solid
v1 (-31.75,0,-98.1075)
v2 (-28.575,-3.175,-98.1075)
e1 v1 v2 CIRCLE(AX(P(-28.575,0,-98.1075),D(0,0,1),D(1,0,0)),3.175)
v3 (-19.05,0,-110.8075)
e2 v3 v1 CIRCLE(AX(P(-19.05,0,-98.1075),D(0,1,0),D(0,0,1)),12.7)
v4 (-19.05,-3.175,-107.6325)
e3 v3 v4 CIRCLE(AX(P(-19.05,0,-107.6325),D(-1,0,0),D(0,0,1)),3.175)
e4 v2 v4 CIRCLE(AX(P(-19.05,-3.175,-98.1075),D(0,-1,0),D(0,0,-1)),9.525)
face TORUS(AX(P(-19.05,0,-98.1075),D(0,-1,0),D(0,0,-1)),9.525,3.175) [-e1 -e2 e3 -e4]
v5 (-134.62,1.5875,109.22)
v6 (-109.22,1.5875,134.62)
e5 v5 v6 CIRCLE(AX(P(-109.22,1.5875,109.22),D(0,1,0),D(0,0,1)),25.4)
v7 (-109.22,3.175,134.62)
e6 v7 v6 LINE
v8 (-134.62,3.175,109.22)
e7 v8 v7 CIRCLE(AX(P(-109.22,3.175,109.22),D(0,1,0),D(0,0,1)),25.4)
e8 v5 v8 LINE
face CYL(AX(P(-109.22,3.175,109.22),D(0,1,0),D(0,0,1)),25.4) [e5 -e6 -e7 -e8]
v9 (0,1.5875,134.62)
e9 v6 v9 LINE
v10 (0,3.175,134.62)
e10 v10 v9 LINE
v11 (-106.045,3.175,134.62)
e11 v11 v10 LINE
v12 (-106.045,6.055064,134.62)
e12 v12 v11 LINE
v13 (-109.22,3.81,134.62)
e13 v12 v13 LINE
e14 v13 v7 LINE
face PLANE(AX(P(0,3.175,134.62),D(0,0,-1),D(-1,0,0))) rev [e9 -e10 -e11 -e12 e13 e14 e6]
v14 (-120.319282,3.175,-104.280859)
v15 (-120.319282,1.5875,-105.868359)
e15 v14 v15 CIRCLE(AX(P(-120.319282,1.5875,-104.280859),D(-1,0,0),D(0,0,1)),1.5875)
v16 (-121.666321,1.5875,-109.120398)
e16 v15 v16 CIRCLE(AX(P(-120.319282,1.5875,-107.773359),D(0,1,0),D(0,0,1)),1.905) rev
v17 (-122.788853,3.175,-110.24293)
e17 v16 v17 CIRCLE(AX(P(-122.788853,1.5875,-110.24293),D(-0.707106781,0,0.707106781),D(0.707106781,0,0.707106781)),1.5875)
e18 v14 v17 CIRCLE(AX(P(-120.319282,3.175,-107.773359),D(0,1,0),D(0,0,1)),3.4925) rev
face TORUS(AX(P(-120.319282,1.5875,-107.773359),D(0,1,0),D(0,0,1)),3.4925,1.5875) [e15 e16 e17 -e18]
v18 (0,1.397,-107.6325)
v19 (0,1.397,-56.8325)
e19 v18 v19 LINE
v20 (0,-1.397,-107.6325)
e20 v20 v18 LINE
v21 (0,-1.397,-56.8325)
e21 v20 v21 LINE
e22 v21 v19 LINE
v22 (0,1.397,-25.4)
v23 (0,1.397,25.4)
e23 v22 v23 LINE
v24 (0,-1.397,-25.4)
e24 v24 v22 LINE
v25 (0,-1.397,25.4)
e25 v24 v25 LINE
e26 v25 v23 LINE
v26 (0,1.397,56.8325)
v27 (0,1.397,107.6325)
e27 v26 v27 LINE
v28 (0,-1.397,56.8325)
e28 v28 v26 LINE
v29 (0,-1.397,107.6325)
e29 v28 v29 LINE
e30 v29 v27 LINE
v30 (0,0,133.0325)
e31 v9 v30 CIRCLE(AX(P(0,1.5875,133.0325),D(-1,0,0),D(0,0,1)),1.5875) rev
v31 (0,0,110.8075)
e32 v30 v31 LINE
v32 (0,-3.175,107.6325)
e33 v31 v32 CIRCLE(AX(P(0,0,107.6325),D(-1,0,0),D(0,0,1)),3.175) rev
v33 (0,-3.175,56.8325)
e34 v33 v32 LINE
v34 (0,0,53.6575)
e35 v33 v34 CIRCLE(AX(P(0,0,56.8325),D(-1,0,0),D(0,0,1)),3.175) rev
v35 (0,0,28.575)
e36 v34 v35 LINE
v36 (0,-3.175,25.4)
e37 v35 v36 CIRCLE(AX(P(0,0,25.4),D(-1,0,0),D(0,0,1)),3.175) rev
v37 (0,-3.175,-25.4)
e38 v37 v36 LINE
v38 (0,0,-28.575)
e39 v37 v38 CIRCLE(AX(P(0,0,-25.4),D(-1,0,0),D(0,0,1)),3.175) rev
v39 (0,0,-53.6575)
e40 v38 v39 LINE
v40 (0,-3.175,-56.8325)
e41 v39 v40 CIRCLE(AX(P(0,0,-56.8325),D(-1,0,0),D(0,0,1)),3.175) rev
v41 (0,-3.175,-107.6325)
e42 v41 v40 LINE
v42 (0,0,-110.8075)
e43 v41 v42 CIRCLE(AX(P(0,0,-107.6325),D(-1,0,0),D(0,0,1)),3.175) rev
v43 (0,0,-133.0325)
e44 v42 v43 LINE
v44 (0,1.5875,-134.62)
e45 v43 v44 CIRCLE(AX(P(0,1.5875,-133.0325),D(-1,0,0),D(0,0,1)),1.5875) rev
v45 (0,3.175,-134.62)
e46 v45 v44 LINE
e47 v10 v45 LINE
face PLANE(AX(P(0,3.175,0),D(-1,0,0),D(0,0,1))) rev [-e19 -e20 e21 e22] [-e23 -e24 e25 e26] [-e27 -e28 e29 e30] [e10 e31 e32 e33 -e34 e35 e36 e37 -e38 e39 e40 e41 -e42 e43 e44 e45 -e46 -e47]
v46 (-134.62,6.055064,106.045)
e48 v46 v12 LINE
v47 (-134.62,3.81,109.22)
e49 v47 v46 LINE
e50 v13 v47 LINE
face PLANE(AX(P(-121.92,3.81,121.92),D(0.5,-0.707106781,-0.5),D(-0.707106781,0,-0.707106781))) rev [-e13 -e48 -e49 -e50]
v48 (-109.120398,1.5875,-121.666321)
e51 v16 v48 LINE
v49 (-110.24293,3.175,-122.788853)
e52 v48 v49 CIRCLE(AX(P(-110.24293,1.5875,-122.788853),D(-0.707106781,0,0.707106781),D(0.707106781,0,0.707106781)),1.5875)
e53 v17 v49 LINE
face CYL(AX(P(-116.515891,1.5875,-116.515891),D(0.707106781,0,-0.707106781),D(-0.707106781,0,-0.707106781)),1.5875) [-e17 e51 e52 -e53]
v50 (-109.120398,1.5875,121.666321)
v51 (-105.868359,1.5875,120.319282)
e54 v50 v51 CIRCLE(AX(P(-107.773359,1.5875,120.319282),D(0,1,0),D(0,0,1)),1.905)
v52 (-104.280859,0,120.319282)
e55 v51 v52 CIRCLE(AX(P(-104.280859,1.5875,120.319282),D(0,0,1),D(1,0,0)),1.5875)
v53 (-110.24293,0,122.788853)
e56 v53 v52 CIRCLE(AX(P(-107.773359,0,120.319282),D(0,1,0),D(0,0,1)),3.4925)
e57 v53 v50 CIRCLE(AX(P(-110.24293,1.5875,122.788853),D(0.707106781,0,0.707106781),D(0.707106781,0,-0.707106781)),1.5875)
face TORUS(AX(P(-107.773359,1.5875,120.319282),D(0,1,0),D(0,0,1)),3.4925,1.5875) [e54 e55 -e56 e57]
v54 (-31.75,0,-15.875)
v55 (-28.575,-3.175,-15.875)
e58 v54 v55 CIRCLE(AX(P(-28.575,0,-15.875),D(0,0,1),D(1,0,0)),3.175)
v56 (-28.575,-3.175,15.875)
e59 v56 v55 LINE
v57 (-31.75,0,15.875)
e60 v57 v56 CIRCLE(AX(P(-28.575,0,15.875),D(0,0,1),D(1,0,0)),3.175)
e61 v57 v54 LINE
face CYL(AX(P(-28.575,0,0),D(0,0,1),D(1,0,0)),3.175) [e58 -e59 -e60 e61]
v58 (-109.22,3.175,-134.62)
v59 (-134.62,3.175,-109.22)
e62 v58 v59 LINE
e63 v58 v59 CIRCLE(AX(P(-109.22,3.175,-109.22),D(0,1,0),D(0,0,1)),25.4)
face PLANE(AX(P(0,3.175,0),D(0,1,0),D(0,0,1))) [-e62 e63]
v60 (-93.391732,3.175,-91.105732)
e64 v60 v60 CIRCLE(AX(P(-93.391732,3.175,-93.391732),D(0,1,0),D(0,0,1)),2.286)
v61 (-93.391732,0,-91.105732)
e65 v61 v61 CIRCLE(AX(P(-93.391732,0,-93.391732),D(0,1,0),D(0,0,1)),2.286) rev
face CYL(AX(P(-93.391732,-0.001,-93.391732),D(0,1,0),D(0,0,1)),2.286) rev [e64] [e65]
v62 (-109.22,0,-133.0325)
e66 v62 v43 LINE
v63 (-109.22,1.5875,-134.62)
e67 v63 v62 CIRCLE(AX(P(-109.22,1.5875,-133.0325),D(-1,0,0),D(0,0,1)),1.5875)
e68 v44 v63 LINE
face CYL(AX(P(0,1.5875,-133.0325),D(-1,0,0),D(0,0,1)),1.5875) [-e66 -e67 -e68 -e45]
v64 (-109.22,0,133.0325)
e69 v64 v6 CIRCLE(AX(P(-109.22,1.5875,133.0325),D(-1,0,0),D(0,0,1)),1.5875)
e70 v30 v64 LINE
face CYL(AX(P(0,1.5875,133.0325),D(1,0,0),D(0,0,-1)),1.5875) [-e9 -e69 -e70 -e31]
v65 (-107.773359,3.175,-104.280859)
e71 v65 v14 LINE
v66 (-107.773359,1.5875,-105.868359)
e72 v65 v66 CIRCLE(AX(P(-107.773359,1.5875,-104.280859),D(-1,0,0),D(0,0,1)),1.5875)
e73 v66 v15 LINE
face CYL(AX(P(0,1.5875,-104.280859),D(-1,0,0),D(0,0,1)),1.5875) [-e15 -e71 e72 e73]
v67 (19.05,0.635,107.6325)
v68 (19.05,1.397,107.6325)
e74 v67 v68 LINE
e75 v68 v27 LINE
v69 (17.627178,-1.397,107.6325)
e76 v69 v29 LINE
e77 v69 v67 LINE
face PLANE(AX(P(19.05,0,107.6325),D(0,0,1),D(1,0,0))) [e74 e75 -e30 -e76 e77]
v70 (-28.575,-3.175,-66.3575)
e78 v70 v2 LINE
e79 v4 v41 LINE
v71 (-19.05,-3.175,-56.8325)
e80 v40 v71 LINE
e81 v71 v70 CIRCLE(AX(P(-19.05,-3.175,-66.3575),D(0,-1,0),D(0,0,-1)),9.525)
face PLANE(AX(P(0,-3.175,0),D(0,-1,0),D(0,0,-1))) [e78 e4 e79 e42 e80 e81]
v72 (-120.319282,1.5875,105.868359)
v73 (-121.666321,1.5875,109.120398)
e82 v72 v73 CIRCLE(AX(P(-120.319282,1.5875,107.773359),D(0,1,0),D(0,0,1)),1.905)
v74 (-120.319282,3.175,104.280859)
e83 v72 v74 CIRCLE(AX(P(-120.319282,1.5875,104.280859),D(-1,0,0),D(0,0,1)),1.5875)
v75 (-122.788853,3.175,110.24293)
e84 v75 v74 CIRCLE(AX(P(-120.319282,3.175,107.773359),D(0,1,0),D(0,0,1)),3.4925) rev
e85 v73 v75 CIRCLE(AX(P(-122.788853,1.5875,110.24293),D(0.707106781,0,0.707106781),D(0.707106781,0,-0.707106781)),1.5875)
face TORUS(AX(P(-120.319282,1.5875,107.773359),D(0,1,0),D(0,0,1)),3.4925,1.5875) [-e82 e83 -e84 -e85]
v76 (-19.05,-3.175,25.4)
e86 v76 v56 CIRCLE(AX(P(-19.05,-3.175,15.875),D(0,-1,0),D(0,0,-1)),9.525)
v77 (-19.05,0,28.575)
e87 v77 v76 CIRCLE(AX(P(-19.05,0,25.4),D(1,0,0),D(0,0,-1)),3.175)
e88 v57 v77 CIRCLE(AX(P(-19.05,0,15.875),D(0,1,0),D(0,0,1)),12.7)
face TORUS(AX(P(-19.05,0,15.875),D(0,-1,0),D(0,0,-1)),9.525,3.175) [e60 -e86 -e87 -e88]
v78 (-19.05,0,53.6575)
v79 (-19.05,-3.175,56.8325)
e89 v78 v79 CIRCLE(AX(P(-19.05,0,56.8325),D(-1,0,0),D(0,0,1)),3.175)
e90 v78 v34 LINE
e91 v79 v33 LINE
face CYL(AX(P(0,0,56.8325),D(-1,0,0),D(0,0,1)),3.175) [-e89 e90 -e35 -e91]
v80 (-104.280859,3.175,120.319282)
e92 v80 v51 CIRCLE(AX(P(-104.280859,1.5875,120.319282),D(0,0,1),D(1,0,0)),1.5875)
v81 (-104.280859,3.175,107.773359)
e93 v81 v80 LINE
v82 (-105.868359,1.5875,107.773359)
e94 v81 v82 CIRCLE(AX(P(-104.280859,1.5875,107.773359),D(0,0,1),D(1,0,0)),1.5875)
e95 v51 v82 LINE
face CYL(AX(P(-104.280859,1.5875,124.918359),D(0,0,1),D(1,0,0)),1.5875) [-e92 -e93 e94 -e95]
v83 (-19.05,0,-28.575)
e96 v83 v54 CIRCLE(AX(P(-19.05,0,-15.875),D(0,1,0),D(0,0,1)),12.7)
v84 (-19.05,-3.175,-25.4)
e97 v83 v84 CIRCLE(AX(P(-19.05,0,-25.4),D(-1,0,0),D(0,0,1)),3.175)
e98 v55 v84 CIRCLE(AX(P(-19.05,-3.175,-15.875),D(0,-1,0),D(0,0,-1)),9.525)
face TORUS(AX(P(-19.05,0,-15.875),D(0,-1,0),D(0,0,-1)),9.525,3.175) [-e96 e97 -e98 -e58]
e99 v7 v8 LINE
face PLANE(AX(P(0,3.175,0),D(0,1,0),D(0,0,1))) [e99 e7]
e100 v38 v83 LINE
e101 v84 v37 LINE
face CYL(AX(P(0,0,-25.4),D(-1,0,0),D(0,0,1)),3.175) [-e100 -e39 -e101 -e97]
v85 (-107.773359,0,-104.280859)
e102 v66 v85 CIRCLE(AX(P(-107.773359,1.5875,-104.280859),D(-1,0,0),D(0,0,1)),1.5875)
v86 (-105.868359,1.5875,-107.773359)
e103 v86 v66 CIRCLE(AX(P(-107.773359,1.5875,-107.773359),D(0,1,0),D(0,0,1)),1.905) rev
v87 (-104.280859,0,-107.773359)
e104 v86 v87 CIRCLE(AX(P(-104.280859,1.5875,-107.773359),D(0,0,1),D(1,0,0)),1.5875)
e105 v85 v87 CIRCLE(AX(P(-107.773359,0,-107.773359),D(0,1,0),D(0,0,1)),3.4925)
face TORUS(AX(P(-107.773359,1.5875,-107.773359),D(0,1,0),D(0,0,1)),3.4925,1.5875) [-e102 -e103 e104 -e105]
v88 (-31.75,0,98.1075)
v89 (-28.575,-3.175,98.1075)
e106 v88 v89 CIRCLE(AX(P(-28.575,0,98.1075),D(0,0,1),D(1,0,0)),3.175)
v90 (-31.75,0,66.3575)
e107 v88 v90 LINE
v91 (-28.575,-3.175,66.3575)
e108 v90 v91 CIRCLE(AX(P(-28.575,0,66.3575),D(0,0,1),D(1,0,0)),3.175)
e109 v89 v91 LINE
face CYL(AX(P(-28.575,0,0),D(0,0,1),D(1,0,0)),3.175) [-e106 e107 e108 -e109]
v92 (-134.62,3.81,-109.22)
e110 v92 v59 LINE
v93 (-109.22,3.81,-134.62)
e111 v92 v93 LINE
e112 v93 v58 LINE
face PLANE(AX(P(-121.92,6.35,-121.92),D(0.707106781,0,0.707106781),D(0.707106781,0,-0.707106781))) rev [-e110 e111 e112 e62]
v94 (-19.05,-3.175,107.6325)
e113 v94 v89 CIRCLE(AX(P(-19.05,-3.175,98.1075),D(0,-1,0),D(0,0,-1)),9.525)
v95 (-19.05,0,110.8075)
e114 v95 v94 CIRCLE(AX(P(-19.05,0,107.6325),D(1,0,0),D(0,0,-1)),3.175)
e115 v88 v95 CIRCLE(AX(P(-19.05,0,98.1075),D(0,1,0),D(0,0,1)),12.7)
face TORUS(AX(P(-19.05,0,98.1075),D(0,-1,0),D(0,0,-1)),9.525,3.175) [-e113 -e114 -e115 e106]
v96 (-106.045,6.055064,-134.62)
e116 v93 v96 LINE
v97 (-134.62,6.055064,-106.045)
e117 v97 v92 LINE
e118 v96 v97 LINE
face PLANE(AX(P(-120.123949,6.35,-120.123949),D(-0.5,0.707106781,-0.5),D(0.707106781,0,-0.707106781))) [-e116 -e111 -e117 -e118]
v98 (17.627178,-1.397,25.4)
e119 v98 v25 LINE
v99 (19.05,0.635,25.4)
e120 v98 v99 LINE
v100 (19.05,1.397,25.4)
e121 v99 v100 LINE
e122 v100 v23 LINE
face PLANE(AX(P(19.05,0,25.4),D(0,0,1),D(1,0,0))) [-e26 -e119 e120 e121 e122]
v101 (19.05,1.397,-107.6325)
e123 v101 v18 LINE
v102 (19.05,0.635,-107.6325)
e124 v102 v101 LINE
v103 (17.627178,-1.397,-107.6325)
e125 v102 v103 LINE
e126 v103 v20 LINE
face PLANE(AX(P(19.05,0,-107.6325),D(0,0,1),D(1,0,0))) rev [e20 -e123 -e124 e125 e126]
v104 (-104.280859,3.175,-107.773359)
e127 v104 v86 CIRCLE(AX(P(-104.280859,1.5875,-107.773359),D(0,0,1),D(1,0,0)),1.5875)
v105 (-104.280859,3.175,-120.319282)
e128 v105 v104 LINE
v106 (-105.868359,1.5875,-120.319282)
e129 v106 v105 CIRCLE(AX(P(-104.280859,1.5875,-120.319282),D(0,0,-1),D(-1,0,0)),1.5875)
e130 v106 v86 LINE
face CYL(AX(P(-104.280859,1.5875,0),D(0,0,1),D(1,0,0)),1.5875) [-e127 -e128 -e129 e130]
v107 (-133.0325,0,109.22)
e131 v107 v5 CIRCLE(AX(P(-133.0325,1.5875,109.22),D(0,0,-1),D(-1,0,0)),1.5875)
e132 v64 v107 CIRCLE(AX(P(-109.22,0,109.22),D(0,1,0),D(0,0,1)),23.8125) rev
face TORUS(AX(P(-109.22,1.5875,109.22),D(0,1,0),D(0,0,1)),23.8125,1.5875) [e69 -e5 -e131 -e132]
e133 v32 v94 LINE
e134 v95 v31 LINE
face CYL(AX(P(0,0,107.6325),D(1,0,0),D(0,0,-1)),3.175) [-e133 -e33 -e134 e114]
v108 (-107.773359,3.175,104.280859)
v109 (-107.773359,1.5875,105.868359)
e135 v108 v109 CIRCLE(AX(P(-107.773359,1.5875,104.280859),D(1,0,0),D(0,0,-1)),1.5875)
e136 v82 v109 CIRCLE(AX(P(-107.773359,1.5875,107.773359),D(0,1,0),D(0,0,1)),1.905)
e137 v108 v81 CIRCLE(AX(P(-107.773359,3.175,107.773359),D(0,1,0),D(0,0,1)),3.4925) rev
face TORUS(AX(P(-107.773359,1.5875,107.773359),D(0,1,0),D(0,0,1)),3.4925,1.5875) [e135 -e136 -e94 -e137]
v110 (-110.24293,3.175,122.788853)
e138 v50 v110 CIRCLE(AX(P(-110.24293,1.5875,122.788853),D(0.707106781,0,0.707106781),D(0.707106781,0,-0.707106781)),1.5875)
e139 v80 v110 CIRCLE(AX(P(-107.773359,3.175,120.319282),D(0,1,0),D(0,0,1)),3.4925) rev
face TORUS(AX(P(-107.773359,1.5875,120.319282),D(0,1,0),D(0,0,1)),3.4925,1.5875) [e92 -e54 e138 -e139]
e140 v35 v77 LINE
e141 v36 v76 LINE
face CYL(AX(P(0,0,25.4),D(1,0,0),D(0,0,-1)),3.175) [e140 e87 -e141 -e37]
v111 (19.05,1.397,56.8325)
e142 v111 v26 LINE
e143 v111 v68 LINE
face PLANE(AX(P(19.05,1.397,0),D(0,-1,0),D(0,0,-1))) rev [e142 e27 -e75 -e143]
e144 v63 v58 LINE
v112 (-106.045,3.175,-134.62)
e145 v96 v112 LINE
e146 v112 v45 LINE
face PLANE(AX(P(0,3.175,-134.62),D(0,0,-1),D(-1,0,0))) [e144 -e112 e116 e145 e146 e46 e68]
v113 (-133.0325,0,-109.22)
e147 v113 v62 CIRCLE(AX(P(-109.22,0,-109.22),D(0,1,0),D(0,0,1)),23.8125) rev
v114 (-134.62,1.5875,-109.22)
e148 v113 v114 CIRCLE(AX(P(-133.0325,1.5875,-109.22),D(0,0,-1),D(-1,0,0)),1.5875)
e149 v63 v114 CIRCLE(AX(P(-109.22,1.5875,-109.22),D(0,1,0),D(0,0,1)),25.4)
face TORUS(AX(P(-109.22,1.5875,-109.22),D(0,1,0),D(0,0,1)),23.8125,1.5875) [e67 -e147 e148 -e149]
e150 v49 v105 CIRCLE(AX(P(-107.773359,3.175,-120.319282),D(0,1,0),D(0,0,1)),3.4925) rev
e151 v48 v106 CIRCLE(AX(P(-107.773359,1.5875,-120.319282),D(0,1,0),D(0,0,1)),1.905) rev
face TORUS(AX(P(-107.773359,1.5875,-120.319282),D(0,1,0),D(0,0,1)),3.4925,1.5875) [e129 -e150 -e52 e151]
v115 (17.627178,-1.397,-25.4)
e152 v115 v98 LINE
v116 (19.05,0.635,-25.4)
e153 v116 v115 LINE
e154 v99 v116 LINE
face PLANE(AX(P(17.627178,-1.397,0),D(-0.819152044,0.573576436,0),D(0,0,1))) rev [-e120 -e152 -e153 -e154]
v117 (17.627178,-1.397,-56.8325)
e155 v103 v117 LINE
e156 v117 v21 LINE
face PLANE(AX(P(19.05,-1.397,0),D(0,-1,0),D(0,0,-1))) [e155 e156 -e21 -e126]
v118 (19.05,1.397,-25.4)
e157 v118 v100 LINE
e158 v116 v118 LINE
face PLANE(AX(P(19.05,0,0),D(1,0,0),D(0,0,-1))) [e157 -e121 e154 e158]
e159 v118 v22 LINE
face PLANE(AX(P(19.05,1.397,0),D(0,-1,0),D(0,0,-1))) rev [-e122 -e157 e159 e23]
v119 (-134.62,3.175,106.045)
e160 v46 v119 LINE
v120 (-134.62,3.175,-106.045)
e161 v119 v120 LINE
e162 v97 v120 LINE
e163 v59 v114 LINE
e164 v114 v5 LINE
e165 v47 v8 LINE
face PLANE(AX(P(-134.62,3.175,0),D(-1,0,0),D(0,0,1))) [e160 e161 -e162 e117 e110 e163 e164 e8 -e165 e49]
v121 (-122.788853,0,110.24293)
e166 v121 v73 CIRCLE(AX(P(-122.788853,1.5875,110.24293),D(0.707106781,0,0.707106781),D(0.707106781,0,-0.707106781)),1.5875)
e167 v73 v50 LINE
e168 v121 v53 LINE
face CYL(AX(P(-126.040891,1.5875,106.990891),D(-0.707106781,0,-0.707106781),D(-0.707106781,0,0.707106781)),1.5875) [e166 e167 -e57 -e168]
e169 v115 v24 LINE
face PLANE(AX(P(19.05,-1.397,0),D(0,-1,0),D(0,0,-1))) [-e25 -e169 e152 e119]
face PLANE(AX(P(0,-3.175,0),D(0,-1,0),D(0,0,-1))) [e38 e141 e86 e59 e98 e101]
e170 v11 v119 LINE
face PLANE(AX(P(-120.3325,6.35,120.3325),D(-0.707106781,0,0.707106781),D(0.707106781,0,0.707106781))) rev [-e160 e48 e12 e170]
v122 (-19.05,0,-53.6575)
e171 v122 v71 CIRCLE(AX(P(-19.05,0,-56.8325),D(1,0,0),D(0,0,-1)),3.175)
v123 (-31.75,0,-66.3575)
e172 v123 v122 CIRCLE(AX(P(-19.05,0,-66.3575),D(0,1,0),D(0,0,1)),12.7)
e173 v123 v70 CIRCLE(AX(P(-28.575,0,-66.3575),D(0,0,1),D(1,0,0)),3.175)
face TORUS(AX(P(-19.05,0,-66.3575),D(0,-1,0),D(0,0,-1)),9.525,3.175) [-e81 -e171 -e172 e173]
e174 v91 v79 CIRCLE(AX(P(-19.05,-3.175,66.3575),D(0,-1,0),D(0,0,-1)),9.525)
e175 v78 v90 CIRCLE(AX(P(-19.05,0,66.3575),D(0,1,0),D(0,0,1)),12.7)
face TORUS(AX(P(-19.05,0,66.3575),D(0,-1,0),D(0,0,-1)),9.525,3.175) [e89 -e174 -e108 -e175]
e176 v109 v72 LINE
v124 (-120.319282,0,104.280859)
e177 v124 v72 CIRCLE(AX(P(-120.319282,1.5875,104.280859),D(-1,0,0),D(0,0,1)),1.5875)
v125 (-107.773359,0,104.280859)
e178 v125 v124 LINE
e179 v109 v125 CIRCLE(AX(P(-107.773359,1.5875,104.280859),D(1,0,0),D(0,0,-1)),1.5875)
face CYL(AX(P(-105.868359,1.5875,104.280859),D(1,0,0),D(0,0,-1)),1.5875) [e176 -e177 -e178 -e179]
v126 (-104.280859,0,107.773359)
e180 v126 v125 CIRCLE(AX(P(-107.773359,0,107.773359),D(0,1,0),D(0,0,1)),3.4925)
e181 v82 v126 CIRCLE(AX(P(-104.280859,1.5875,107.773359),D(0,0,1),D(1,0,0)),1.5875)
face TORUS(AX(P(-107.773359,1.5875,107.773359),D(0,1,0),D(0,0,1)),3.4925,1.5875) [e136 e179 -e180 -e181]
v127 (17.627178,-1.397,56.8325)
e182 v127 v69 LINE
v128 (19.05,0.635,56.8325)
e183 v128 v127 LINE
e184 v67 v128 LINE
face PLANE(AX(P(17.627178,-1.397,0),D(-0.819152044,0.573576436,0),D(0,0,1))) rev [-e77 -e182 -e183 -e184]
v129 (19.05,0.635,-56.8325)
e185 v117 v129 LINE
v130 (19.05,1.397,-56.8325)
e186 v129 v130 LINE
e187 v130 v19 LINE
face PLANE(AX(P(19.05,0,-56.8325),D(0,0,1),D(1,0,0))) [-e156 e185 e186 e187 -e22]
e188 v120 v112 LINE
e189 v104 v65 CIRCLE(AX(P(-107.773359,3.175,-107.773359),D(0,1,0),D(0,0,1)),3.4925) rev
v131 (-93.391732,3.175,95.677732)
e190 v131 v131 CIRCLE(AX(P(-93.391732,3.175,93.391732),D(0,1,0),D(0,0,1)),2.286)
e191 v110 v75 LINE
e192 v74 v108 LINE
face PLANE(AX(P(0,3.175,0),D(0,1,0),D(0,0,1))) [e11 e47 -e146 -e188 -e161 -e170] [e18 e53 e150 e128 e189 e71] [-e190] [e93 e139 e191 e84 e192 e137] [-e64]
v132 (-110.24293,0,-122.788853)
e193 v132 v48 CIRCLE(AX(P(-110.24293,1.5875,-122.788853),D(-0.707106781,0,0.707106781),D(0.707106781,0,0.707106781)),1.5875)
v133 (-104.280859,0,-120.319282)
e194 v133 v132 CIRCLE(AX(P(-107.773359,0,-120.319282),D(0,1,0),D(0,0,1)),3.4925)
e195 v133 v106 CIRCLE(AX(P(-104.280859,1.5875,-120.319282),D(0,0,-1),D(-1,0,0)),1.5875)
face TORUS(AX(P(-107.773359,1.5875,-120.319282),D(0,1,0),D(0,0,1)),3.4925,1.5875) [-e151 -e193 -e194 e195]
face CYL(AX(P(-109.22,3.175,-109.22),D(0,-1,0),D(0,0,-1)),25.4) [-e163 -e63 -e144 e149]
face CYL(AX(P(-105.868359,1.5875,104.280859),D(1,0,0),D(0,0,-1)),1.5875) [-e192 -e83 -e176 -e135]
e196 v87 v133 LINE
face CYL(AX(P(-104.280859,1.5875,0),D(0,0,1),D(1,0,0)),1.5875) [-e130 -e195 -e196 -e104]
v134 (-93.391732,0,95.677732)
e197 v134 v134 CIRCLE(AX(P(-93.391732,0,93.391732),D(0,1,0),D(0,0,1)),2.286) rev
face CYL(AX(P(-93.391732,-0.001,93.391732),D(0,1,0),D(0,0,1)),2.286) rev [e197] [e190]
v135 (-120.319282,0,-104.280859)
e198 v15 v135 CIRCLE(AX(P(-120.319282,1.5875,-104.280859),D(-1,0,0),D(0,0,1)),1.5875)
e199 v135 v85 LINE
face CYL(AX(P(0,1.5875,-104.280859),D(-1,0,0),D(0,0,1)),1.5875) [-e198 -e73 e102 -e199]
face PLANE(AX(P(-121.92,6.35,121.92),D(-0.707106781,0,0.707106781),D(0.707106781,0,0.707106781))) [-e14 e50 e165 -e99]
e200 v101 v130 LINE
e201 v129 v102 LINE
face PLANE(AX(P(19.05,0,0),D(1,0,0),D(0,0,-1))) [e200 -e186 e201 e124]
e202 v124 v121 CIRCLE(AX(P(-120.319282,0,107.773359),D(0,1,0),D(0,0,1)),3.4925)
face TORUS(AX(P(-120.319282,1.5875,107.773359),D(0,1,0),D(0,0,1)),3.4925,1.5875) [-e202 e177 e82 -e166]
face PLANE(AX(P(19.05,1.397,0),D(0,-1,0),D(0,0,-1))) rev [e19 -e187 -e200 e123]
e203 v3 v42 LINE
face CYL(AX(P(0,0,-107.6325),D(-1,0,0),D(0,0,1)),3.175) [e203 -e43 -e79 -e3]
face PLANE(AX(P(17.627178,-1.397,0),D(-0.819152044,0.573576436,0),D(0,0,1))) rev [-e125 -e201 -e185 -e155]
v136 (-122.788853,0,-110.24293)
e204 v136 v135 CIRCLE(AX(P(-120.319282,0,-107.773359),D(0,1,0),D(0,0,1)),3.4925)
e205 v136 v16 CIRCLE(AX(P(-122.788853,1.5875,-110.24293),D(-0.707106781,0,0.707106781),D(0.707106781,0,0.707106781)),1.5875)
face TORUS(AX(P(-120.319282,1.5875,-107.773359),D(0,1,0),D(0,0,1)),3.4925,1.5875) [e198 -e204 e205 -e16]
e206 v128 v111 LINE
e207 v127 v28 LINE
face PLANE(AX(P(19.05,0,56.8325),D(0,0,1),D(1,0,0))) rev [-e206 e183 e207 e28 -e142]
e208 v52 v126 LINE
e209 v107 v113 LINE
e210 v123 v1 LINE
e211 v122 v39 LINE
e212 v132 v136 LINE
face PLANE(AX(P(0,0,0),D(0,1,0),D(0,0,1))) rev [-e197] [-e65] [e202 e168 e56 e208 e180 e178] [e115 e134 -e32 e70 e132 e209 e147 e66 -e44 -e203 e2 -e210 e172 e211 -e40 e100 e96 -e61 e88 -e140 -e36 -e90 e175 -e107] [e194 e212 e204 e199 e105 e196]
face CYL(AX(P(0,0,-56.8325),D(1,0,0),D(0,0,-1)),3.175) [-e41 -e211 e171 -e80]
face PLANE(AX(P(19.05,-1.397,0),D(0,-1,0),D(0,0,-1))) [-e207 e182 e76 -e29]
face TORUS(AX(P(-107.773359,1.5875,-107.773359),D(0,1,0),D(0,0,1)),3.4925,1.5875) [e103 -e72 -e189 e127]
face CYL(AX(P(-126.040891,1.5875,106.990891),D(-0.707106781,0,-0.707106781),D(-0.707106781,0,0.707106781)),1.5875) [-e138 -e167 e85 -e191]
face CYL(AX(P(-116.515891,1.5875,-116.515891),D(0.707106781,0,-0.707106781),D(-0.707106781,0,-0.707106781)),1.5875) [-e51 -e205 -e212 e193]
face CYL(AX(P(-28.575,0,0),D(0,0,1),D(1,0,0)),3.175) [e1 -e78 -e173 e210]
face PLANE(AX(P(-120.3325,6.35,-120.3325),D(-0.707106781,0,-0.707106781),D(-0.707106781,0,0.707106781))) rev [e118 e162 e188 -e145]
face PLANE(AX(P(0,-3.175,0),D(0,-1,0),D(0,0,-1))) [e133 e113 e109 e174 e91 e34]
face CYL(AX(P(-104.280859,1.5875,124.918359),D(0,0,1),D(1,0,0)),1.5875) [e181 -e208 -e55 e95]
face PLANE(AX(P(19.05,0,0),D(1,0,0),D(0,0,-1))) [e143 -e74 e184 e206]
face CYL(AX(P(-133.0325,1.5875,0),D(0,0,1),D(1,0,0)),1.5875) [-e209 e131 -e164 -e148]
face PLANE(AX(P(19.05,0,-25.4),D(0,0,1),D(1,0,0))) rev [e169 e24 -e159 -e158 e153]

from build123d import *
from OCP.BRepFilletAPI import BRepFilletAPI_MakeChamfer

# Parameters (mm, degrees)
SKETCH1_W           = 134.62
SKETCH1_H           = 269.24
BOSS_EXTRUDE1_DEPTH = 3.175
BOSS_EXTRUDE2_DEPTH = 3.175
CUT_EXTRUDE1_REACH  = 192.408
SKETCH2_3_R         = 2.286
CHAMFER1_SIZE       = 2.54
FILLET1_R           = 1.905
FILLET2_R           = 1.5875
FILLET3_R           = 25.4
FILLET4_R           = 1.5875
SKETCH3_W           = 31.75
SKETCH3_H           = 57.15
BOSS_EXTRUDE3_DEPTH = 3.175
SKETCH4_W           = 50.8
SKETCH4_H           = 2.794
BOSS_EXTRUDE4_DEPTH = 19.05
FILLET5_R           = 12.7
FILLET6_R           = 3.175
CHAMFER2_SIZE       = 2.032
CHAMFER2_SIZE2      = 1.422821718


# Some blends are built 0.0001 mm under size
with BuildPart() as part:
    # Sketch1 → Boss-Extrude1 (new body)
    with BuildSketch(Plane(origin=(0, 0, 0), x_dir=(1, 0, 0), z_dir=(0, 1, 0))):
        with Locations((-67.31, 0)):
            Rectangle(SKETCH1_W, SKETCH1_H)
    extrude(amount=BOSS_EXTRUDE1_DEPTH)

    # Sketch2 → Boss-Extrude2 (add)
    with BuildSketch(Plane(origin=(0, 3.175, 0), x_dir=(1, 0, 0), z_dir=(0, 1, 0))):
        Polygon((-134.62, 109.22), (-134.62, 106.045), (-120.3325, 120.3325), (-106.045, 134.62), (-109.22, 134.62), align=None)
        Polygon((-134.62, -109.22), (-109.22, -134.62), (-106.045, -134.62), (-120.3325, -120.3325), (-134.62, -106.045), align=None)
    extrude(amount=BOSS_EXTRUDE2_DEPTH)

    # Sketch2<3> → Cut-Extrude1 (cut, up to next)
    with BuildSketch(Plane(origin=(0, 3.175, 0), x_dir=(1, 0, 0), z_dir=(0, 1, 0)), mode=Mode.PRIVATE) as cut_extrude1_sk1:
        with Locations(Location((-93.391731637, 93.391731637, 0), (0, 0, 270))):
            Circle(SKETCH2_3_R)
    cut_extrude1_tool1 = extrude(cut_extrude1_sk1.sketch, amount=-CUT_EXTRUDE1_REACH, mode=Mode.PRIVATE) & part.part
    # Sketch2<3> → Cut-Extrude1 (cut, up to next)
    with BuildSketch(Plane(origin=(0, 3.175, 0), x_dir=(1, 0, 0), z_dir=(0, 1, 0)), mode=Mode.PRIVATE) as cut_extrude1_sk2:
        with Locations(Location((-93.391731637, -93.391731637, 0), (0, 0, 270))):
            Circle(SKETCH2_3_R)
    cut_extrude1_tool2 = extrude(cut_extrude1_sk2.sketch, amount=-CUT_EXTRUDE1_REACH, mode=Mode.PRIVATE) & part.part
    # Sketch2<3> → Cut-Extrude1 (cut, up to next)
    with BuildSketch(Plane(origin=(0, 3.175, 0), x_dir=(1, 0, 0), z_dir=(0, 1, 0)), mode=Mode.PRIVATE) as cut_extrude1_sk3:
        Polygon((-124.918359133, -105.868359133), (-105.868359133, -124.918359133), (-105.868359133, -105.868359133), align=None)
    cut_extrude1_tool3 = extrude(cut_extrude1_sk3.sketch, amount=-CUT_EXTRUDE1_REACH, mode=Mode.PRIVATE) & part.part
    # Sketch2<3> → Cut-Extrude1 (cut, up to next)
    with BuildSketch(Plane(origin=(0, 3.175, 0), x_dir=(1, 0, 0), z_dir=(0, 1, 0)), mode=Mode.PRIVATE) as cut_extrude1_sk4:
        Polygon((-124.918359133, 105.868359133), (-105.868359133, 124.918359133), (-105.868359133, 105.868359133), align=None)
    cut_extrude1_tool4 = extrude(cut_extrude1_sk4.sketch, amount=-CUT_EXTRUDE1_REACH, mode=Mode.PRIVATE) & part.part
    add(cut_extrude1_tool1.solids().sort_by_distance((-93.391732, 3.175, -93.391732))[0], mode=Mode.SUBTRACT)
    add(cut_extrude1_tool2.solids().sort_by_distance((-93.391732, 3.175, 93.391732))[0], mode=Mode.SUBTRACT)
    add(cut_extrude1_tool3.solids().sort_by_distance((-112.218359, 3.175, 112.218359))[0], mode=Mode.SUBTRACT)
    add(cut_extrude1_tool4.solids().sort_by_distance((-112.218359, 3.175, -112.218359))[0], mode=Mode.SUBTRACT)

    # Chamfer1
    # the kernel refuses this chamfer: 2.54 mm, written as the material it takes off along each edge
    with BuildSketch(Plane(origin=(-104.601125621, 6.35, -139.238874379), x_dir=(0.7068394360706735, 0.027495876610586185, 0.7068394360706735), z_dir=(-0.7071067811865476, 0, 0.7071067811865476))) as chamfer1_piece_1:
        Polygon((CHAMFER1_SIZE * 0.999621916911, -CHAMFER1_SIZE * 0.0274958766106), (-CHAMFER1_SIZE * 0.0274958766106, -CHAMFER1_SIZE * 0.999621916911), (0, 0), align=None)
    extrude(amount=48.985174063, mode=Mode.SUBTRACT)
    with BuildSketch(Plane(origin=(-139.238874379, 6.35, 104.601125621), x_dir=(-0.019442520806012394, -0.9996219169112968, 0.019442520806012414), z_dir=(0.7071067811865479, 0, 0.7071067811865471))) as chamfer1_piece_2:
        Polygon((CHAMFER1_SIZE * 0.999621916911, CHAMFER1_SIZE * 0.0274958766106), (-CHAMFER1_SIZE * 0.0274958766106, CHAMFER1_SIZE * 0.999621916911), (0, 0), align=None)
    extrude(amount=48.985174063, mode=Mode.SUBTRACT)

    # Fillet1
    fillet1_edges = [part.edges().sort_by_distance(p)[0] for p in [
        (-105.868359133, 1.5875, -124.918359133),
        (-105.868359133, 1.5875, -105.868359133),
        (-124.918359133, 1.5875, -105.868359133),
        (-105.868359133, 1.5875, 124.918359133),
        (-124.918359133, 1.5875, 105.868359133),
        (-105.868359133, 1.5875, 105.868359133),
    ]]
    fillet(fillet1_edges, radius=FILLET1_R)

    # Fillet2
    fillet2_edges = [part.edges().sort_by_distance(p)[0] for p in [
        (-107.044347195, 0, 122.079272807),
        (-105.868359133, 0, 114.046320715),
        (-106.426320715, 0, 106.426320715),
        (-114.046320715, 0, 105.868359133),
        (-122.079272807, 0, 107.044347195),
        (-122.079272807, 3.175, 107.044347195),
        (-114.046320715, 3.175, 105.868359133),
        (-106.426320715, 3.175, 106.426320715),
        (-105.868359133, 3.175, 114.046320715),
        (-107.044347195, 3.175, 122.079272807),
        (-122.079272807, 3.175, -107.044347195),
        (-114.046320715, 3.175, -105.868359133),
        (-106.426320715, 3.175, -106.426320715),
        (-105.868359133, 3.175, -114.046320715),
        (-107.044347195, 3.175, -122.079272807),
        (-107.044347195, 0, -122.079272807),
        (-105.868359133, 0, -114.046320715),
        (-106.426320715, 0, -106.426320715),
        (-114.046320715, 0, -105.868359133),
        (-122.079272807, 0, -107.044347195),
        (-115.393359133, 0, 115.393359133),
        (-115.393359133, 3.175, 115.393359133),
        (-115.393359133, 3.175, -115.393359133),
        (-115.393359133, 0, -115.393359133),
    ]]
    fillet(fillet2_edges, radius=FILLET2_R - 0.0001)  # a hair under: the kernel refuses the full size

    # Fillet3
    fillet3_edges = [part.edges().sort_by_distance(p)[0] for p in [
        (-134.62, 1.5875, 134.62),
        (-134.62, 1.5875, -134.62),
    ]]
    fillet(fillet3_edges, radius=FILLET3_R)

    # Fillet4
    fillet4_edges = [part.edges().sort_by_distance(p)[0] for p in [
        (-54.61, 0, 134.62),
        (-54.61, 0, -134.62),
        (-134.62, 0, 0),
        (-127.180512242, 0, -127.180512242),
        (-127.180512242, 0, 127.180512242),
    ]]
    fillet(fillet4_edges, radius=FILLET4_R)

    # Sketch3 → Boss-Extrude3 (add)
    with BuildSketch(Plane.XZ):
        with Locations((-15.875, 82.2325)):
            Rectangle(SKETCH3_W, SKETCH3_H)
        with Locations((-15.875, 0)):
            Rectangle(SKETCH3_W, SKETCH3_H)
        with Locations((-15.875, -82.2325)):
            Rectangle(SKETCH3_W, SKETCH3_H)
    extrude(amount=BOSS_EXTRUDE3_DEPTH)

    # Sketch4 → Boss-Extrude4 (add)
    with BuildSketch(Plane(origin=(0, 0, 0), x_dir=(0, 0, -1), z_dir=(1, 0, 0))):
        with Locations((-82.2325, 0)):
            Rectangle(SKETCH4_W, SKETCH4_H)
        Rectangle(SKETCH4_W, SKETCH4_H)
        with Locations((82.2325, 0)):
            Rectangle(SKETCH4_W, SKETCH4_H)
    extrude(amount=BOSS_EXTRUDE4_DEPTH)

    # Fillet5
    fillet5_edges = [part.edges().sort_by_distance(p)[0] for p in [
        (-31.75, -1.5875, 110.8075),
        (-31.75, -1.5875, 53.6575),
        (-31.75, -1.5875, 28.575),
        (-31.75, -1.5875, -28.575),
        (-31.75, -1.5875, -53.6575),
        (-31.75, -1.5875, -110.8075),
    ]]
    fillet(fillet5_edges, radius=FILLET5_R)

    # Fillet6
    fillet6_edges = [part.edges().sort_by_distance(p)[0] for p in [
        (-9.525, -3.175, -53.6575),
        (-28.030256121, -3.175, -57.377243879),
        (-31.75, -3.175, -82.2325),
        (-28.030256121, -3.175, -107.087756121),
        (-9.525, -3.175, 28.575),
        (-28.030256121, -3.175, 24.855256121),
        (-31.75, -3.175, 0),
        (-28.030256121, -3.175, -24.855256121),
        (-9.525, -3.175, 110.8075),
        (-28.030256121, -3.175, 107.087756121),
        (-31.75, -3.175, 82.2325),
        (-28.030256121, -3.175, 57.377243879),
        (-9.525, -3.175, -110.8075),
        (-9.525, -3.175, -28.575),
        (-9.525, -3.175, 53.6575),
    ]]
    fillet(fillet6_edges, radius=FILLET6_R - 0.0001)  # a hair under: the kernel refuses the full size

    # Chamfer2: one chamfer whose edges measure the first distance from different faces: ONE call of the kernel's chamfer builder (chamfer() names one face for all edges)
    chamfer2_edges_1 = [part.edges().sort_by_distance(p)[0] for p in [
        (19.05, -1.397, 82.2325),
    ]]
    chamfer2_side_1 = [part.faces().sort_by_distance(p)[0] for p in [
        (19.05, 0, 82.2325),
    ]]
    chamfer2_edges_2 = [part.edges().sort_by_distance(p)[0] for p in [
        (19.05, -1.397, 0),
    ]]
    chamfer2_side_2 = [part.faces().sort_by_distance(p)[0] for p in [
        (19.05, 0, 0),
    ]]
    chamfer2_edges_3 = [part.edges().sort_by_distance(p)[0] for p in [
        (19.05, -1.397, -82.2325),
    ]]
    chamfer2_side_3 = [part.faces().sort_by_distance(p)[0] for p in [
        (19.05, 0, -82.2325),
    ]]
    chamfer2 = BRepFilletAPI_MakeChamfer(part.part.solid().wrapped)
    for e in chamfer2_edges_1:
        chamfer2.Add(CHAMFER2_SIZE, CHAMFER2_SIZE2, e.wrapped, chamfer2_side_1[0].wrapped)  # the first distance lies on this face
    for e in chamfer2_edges_2:
        chamfer2.Add(CHAMFER2_SIZE, CHAMFER2_SIZE2, e.wrapped, chamfer2_side_2[0].wrapped)  # the first distance lies on this face
    for e in chamfer2_edges_3:
        chamfer2.Add(CHAMFER2_SIZE, CHAMFER2_SIZE2, e.wrapped, chamfer2_side_3[0].wrapped)  # the first distance lies on this face
    add(Compound.cast(chamfer2.Shape()), mode=Mode.REPLACE)


solid = part.part
